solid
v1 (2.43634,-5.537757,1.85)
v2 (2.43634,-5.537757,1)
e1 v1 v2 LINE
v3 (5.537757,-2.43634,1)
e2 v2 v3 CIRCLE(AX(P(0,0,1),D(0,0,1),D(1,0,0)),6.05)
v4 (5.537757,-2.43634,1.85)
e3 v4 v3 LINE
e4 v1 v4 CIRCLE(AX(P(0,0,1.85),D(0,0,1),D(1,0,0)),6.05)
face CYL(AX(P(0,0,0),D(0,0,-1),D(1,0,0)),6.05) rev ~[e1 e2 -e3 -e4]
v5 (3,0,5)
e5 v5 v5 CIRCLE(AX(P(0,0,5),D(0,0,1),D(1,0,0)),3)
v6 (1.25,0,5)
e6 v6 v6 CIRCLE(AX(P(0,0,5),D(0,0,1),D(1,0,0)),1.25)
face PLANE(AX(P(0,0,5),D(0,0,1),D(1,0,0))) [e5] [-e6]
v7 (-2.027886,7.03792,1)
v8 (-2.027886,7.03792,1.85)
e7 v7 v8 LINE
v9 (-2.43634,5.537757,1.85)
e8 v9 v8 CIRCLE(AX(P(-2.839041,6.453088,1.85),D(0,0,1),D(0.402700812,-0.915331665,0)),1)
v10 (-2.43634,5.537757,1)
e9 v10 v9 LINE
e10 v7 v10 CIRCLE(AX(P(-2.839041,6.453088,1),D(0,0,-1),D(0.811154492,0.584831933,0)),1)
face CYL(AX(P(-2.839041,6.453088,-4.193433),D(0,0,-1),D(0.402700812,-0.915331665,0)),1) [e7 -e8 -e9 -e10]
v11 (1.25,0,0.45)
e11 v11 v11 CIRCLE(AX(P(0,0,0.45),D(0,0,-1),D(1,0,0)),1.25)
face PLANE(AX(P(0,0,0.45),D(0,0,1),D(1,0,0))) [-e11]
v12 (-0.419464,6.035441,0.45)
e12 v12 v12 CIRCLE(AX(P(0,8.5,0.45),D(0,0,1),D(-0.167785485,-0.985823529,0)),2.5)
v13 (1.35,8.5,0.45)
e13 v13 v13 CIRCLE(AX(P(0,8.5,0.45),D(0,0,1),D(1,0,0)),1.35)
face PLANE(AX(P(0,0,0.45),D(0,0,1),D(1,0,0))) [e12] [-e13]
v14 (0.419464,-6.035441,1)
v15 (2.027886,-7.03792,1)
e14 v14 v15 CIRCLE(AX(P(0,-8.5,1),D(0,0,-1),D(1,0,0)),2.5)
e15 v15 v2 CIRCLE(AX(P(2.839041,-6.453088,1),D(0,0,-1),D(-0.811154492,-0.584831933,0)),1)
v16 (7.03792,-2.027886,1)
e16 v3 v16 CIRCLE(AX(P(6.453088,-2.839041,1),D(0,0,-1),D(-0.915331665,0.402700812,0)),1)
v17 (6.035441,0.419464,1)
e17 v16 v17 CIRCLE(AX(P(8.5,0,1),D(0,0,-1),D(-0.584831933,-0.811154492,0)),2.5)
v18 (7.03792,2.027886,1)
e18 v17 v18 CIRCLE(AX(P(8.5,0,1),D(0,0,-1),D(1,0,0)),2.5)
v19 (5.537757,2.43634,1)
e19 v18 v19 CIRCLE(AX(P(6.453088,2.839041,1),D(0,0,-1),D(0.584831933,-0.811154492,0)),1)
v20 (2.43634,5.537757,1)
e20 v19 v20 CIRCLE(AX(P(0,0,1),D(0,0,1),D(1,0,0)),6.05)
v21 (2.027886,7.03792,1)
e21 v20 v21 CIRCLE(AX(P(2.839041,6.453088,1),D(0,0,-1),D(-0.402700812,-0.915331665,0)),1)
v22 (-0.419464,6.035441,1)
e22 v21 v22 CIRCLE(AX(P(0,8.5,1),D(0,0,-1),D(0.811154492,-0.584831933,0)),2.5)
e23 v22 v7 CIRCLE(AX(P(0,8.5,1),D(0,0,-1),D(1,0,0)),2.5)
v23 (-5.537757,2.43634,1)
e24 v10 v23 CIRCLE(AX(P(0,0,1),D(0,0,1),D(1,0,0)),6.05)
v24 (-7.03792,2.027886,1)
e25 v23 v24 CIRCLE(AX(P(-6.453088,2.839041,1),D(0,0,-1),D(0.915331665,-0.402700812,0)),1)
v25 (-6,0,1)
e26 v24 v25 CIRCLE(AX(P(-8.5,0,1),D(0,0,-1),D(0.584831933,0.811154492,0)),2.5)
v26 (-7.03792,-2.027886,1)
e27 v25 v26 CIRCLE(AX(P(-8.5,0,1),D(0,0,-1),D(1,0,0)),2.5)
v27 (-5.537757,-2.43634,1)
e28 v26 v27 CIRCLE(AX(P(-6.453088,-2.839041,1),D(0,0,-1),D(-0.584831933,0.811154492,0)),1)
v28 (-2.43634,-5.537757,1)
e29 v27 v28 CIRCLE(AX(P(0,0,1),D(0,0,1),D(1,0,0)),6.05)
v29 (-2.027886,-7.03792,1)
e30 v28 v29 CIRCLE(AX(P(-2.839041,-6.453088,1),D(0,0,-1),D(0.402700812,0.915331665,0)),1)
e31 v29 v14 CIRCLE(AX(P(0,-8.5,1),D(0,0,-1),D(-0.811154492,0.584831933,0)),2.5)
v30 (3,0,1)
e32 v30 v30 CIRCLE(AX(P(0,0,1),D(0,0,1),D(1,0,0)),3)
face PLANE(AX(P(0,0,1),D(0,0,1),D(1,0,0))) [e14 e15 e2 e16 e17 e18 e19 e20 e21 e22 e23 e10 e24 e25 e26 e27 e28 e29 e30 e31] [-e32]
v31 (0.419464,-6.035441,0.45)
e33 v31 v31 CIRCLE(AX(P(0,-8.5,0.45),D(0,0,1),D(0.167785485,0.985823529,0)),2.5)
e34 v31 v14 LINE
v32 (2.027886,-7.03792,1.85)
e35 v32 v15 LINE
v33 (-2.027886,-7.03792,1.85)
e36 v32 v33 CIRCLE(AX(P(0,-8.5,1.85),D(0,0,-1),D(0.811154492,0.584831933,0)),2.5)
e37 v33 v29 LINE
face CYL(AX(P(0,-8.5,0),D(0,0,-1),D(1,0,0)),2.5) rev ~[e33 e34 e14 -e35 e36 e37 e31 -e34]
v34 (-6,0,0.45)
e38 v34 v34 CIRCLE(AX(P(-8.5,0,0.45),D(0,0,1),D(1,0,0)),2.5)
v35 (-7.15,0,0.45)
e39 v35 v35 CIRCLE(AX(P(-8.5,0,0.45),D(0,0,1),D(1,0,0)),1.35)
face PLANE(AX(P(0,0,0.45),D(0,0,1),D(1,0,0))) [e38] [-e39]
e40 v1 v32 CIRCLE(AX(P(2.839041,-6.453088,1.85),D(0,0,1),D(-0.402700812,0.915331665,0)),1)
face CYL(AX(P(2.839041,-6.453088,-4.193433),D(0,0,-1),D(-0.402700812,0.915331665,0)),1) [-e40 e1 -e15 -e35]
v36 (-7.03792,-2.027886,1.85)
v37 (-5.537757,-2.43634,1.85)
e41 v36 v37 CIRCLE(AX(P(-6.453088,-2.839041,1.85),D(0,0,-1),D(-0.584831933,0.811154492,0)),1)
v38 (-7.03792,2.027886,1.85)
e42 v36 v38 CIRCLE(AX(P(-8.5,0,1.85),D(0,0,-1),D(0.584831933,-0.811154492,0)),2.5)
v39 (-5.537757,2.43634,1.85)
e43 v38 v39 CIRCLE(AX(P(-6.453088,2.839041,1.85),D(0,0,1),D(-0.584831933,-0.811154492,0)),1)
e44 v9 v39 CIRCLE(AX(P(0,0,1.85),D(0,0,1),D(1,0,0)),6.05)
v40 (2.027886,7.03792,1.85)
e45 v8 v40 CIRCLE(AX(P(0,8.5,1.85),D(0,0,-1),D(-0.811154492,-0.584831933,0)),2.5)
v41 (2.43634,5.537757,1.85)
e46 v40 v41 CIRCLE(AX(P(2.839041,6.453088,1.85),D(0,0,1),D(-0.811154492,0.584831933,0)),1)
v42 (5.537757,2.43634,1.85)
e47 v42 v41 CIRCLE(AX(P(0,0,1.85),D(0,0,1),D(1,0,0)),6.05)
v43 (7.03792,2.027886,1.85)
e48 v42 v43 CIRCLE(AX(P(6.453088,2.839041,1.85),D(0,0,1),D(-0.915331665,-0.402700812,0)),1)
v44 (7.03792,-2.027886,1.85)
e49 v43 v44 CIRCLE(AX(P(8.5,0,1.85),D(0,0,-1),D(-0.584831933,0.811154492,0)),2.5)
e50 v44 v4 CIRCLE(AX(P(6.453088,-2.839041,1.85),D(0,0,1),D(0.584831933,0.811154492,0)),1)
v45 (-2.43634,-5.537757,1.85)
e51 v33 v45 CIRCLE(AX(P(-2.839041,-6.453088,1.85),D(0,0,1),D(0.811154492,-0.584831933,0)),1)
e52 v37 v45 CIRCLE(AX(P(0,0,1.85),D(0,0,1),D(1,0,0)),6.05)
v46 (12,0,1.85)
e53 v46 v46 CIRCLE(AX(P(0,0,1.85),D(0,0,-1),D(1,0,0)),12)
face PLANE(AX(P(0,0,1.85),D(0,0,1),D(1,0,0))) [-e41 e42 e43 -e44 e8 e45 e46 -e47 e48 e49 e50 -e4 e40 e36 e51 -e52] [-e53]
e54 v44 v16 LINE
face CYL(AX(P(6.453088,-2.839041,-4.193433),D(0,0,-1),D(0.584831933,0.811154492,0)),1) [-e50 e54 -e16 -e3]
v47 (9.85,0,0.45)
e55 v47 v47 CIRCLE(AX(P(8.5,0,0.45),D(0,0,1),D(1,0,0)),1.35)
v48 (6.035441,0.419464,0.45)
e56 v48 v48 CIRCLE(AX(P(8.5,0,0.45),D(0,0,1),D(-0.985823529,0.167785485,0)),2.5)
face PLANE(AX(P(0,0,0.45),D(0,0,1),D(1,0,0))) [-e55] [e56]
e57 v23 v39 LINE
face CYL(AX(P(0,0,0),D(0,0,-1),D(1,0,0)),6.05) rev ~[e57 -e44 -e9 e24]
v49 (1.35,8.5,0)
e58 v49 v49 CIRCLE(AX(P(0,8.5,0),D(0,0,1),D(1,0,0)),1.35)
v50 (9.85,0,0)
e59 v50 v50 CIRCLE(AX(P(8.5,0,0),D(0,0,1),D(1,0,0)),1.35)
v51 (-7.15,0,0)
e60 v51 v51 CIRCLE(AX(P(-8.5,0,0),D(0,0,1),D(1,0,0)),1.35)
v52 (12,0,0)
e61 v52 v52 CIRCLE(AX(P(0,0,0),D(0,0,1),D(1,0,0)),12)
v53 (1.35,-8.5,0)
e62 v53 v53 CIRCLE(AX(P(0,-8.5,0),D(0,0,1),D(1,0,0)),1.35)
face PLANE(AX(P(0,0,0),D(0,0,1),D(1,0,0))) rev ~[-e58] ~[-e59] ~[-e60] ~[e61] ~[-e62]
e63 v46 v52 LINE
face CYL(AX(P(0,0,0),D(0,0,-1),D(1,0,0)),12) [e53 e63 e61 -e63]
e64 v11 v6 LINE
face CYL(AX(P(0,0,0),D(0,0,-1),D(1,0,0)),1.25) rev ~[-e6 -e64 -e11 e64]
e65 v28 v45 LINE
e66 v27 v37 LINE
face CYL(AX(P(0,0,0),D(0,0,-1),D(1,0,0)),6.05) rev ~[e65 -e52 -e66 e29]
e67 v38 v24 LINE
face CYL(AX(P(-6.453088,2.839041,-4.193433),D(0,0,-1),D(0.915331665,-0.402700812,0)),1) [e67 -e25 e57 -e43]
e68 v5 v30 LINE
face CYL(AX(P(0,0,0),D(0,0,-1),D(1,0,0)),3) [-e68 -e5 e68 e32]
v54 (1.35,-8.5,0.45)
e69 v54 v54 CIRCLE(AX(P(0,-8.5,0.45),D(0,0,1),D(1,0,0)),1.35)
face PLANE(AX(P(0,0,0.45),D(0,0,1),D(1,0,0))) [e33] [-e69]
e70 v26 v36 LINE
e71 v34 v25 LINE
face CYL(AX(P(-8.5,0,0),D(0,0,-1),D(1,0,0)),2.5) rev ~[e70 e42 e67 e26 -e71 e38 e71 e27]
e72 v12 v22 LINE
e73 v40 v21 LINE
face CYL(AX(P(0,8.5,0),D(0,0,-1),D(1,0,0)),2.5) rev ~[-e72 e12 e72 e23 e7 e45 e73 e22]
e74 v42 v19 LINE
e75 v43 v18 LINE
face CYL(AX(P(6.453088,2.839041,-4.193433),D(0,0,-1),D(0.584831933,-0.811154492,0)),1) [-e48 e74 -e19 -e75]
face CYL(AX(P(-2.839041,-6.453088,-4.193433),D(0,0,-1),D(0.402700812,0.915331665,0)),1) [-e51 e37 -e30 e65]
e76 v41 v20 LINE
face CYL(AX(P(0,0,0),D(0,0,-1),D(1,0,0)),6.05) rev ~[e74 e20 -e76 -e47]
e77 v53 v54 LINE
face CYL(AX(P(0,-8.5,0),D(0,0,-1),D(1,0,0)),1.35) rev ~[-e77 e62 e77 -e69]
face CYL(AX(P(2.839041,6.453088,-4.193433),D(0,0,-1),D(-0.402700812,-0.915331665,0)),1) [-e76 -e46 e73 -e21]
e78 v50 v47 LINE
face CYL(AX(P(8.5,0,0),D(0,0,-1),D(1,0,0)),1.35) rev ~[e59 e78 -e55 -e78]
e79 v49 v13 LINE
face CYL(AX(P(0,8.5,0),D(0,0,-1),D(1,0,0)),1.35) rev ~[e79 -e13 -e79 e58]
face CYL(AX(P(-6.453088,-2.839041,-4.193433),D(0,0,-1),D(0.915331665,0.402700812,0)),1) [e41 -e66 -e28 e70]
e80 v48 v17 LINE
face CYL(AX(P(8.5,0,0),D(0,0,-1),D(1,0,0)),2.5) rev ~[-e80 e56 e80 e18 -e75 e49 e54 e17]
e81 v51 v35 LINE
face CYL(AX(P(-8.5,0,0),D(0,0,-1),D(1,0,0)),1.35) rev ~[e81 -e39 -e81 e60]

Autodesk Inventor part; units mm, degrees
ref_plane "YZ Plane" through (0, 0, 0) normal (1, 0, 0) x (0, 1, 0)
ref_plane "XZ Plane" through (0, 0, 0) normal (0, 1, 0) x (-1, 0, 0)
ref_plane "XY Plane" through (0, 0, 0) normal (0, 0, 1) x (1, 0, 0)
sketch "スケッチ1" plane through (0, 0, 0) normal (0, 0, 1) x (1, 0, 0)
  circle A0 centre (0, 8.5) radius 1.35
  circle A1 centre (0, 0) radius 1.25
  circle A2 centre (0, 0) radius 3
  circle A3 centre (0, 0) radius 6.05
  circle A4 centre (0, 8.5) radius 2.5
  circle A5 centre (-8.5, 0) radius 1.35
  circle A6 centre (-8.5, 0) radius 2.5
  circle A7 centre (0, -8.5) radius 1.35
  circle A8 centre (0, -8.5) radius 2.5
  circle A9 centre (8.5, 0) radius 1.35
  circle A10 centre (8.5, 0) radius 2.5
  circle A11 centre (0, 0) radius 6 construction
  circle A12 centre (0, 0) radius 12
  point P0 (6.0354, -0.4195)
  point P1 (6.0354, 0.4195)
  point P2 (0.4195, 6.0354)
  point P3 (-0.4195, 6.0354)
  point P4 (-6.0354, 0.4195)
  point P5 (-6.0354, -0.4195)
  point P6 (-0.4195, -6.0354)
  point P7 (0.4195, -6.0354)
  dimension "d0" = 2.7
  dimension "d1" = 8.5
  dimension "d3" = 2.5
  dimension "d33" = 6
  dimension "d55" = 12.1
  dimension "d58" = 5
  dimension "d61" = 360
  dimension "d66" = 12
  dimension "d71" = 24
extrude "押し出し1" add sketch "スケッチ1" along normal blind 5 contours A2
extrude "押し出し2" add sketch "スケッチ1" along normal blind 0.45 contours A1 | A2 | A3 A10 | A3 A10 | A4 A3 | A3 A4 | A8 A3 | A3 A8 | A6 A3 | A3 A6
extrude "押し出し3" add sketch "スケッチ1" along normal blind 1.85 contours A12
extrude "押し出し4" add sketch "スケッチ1" along normal blind 1 contours A10 A3 A8 A6 A4
fillet "フィレット2" radius 1 8 edges at (-6.0354, -0.4195, 1.425) (-6.0354, 0.4195, 1.425) (0.4195, -6.0354, 1.425) (-0.4195, -6.0354, 1.425) (6.0354, 0.4195, 1.425) (6.0354, -0.4195, 1.425) (0.4195, 6.0354, 1.425) (-0.4195, 6.0354, 1.425)
properties part number "足首_独立ピッチ_1_2" material "アルミニウム 2014-T4"
